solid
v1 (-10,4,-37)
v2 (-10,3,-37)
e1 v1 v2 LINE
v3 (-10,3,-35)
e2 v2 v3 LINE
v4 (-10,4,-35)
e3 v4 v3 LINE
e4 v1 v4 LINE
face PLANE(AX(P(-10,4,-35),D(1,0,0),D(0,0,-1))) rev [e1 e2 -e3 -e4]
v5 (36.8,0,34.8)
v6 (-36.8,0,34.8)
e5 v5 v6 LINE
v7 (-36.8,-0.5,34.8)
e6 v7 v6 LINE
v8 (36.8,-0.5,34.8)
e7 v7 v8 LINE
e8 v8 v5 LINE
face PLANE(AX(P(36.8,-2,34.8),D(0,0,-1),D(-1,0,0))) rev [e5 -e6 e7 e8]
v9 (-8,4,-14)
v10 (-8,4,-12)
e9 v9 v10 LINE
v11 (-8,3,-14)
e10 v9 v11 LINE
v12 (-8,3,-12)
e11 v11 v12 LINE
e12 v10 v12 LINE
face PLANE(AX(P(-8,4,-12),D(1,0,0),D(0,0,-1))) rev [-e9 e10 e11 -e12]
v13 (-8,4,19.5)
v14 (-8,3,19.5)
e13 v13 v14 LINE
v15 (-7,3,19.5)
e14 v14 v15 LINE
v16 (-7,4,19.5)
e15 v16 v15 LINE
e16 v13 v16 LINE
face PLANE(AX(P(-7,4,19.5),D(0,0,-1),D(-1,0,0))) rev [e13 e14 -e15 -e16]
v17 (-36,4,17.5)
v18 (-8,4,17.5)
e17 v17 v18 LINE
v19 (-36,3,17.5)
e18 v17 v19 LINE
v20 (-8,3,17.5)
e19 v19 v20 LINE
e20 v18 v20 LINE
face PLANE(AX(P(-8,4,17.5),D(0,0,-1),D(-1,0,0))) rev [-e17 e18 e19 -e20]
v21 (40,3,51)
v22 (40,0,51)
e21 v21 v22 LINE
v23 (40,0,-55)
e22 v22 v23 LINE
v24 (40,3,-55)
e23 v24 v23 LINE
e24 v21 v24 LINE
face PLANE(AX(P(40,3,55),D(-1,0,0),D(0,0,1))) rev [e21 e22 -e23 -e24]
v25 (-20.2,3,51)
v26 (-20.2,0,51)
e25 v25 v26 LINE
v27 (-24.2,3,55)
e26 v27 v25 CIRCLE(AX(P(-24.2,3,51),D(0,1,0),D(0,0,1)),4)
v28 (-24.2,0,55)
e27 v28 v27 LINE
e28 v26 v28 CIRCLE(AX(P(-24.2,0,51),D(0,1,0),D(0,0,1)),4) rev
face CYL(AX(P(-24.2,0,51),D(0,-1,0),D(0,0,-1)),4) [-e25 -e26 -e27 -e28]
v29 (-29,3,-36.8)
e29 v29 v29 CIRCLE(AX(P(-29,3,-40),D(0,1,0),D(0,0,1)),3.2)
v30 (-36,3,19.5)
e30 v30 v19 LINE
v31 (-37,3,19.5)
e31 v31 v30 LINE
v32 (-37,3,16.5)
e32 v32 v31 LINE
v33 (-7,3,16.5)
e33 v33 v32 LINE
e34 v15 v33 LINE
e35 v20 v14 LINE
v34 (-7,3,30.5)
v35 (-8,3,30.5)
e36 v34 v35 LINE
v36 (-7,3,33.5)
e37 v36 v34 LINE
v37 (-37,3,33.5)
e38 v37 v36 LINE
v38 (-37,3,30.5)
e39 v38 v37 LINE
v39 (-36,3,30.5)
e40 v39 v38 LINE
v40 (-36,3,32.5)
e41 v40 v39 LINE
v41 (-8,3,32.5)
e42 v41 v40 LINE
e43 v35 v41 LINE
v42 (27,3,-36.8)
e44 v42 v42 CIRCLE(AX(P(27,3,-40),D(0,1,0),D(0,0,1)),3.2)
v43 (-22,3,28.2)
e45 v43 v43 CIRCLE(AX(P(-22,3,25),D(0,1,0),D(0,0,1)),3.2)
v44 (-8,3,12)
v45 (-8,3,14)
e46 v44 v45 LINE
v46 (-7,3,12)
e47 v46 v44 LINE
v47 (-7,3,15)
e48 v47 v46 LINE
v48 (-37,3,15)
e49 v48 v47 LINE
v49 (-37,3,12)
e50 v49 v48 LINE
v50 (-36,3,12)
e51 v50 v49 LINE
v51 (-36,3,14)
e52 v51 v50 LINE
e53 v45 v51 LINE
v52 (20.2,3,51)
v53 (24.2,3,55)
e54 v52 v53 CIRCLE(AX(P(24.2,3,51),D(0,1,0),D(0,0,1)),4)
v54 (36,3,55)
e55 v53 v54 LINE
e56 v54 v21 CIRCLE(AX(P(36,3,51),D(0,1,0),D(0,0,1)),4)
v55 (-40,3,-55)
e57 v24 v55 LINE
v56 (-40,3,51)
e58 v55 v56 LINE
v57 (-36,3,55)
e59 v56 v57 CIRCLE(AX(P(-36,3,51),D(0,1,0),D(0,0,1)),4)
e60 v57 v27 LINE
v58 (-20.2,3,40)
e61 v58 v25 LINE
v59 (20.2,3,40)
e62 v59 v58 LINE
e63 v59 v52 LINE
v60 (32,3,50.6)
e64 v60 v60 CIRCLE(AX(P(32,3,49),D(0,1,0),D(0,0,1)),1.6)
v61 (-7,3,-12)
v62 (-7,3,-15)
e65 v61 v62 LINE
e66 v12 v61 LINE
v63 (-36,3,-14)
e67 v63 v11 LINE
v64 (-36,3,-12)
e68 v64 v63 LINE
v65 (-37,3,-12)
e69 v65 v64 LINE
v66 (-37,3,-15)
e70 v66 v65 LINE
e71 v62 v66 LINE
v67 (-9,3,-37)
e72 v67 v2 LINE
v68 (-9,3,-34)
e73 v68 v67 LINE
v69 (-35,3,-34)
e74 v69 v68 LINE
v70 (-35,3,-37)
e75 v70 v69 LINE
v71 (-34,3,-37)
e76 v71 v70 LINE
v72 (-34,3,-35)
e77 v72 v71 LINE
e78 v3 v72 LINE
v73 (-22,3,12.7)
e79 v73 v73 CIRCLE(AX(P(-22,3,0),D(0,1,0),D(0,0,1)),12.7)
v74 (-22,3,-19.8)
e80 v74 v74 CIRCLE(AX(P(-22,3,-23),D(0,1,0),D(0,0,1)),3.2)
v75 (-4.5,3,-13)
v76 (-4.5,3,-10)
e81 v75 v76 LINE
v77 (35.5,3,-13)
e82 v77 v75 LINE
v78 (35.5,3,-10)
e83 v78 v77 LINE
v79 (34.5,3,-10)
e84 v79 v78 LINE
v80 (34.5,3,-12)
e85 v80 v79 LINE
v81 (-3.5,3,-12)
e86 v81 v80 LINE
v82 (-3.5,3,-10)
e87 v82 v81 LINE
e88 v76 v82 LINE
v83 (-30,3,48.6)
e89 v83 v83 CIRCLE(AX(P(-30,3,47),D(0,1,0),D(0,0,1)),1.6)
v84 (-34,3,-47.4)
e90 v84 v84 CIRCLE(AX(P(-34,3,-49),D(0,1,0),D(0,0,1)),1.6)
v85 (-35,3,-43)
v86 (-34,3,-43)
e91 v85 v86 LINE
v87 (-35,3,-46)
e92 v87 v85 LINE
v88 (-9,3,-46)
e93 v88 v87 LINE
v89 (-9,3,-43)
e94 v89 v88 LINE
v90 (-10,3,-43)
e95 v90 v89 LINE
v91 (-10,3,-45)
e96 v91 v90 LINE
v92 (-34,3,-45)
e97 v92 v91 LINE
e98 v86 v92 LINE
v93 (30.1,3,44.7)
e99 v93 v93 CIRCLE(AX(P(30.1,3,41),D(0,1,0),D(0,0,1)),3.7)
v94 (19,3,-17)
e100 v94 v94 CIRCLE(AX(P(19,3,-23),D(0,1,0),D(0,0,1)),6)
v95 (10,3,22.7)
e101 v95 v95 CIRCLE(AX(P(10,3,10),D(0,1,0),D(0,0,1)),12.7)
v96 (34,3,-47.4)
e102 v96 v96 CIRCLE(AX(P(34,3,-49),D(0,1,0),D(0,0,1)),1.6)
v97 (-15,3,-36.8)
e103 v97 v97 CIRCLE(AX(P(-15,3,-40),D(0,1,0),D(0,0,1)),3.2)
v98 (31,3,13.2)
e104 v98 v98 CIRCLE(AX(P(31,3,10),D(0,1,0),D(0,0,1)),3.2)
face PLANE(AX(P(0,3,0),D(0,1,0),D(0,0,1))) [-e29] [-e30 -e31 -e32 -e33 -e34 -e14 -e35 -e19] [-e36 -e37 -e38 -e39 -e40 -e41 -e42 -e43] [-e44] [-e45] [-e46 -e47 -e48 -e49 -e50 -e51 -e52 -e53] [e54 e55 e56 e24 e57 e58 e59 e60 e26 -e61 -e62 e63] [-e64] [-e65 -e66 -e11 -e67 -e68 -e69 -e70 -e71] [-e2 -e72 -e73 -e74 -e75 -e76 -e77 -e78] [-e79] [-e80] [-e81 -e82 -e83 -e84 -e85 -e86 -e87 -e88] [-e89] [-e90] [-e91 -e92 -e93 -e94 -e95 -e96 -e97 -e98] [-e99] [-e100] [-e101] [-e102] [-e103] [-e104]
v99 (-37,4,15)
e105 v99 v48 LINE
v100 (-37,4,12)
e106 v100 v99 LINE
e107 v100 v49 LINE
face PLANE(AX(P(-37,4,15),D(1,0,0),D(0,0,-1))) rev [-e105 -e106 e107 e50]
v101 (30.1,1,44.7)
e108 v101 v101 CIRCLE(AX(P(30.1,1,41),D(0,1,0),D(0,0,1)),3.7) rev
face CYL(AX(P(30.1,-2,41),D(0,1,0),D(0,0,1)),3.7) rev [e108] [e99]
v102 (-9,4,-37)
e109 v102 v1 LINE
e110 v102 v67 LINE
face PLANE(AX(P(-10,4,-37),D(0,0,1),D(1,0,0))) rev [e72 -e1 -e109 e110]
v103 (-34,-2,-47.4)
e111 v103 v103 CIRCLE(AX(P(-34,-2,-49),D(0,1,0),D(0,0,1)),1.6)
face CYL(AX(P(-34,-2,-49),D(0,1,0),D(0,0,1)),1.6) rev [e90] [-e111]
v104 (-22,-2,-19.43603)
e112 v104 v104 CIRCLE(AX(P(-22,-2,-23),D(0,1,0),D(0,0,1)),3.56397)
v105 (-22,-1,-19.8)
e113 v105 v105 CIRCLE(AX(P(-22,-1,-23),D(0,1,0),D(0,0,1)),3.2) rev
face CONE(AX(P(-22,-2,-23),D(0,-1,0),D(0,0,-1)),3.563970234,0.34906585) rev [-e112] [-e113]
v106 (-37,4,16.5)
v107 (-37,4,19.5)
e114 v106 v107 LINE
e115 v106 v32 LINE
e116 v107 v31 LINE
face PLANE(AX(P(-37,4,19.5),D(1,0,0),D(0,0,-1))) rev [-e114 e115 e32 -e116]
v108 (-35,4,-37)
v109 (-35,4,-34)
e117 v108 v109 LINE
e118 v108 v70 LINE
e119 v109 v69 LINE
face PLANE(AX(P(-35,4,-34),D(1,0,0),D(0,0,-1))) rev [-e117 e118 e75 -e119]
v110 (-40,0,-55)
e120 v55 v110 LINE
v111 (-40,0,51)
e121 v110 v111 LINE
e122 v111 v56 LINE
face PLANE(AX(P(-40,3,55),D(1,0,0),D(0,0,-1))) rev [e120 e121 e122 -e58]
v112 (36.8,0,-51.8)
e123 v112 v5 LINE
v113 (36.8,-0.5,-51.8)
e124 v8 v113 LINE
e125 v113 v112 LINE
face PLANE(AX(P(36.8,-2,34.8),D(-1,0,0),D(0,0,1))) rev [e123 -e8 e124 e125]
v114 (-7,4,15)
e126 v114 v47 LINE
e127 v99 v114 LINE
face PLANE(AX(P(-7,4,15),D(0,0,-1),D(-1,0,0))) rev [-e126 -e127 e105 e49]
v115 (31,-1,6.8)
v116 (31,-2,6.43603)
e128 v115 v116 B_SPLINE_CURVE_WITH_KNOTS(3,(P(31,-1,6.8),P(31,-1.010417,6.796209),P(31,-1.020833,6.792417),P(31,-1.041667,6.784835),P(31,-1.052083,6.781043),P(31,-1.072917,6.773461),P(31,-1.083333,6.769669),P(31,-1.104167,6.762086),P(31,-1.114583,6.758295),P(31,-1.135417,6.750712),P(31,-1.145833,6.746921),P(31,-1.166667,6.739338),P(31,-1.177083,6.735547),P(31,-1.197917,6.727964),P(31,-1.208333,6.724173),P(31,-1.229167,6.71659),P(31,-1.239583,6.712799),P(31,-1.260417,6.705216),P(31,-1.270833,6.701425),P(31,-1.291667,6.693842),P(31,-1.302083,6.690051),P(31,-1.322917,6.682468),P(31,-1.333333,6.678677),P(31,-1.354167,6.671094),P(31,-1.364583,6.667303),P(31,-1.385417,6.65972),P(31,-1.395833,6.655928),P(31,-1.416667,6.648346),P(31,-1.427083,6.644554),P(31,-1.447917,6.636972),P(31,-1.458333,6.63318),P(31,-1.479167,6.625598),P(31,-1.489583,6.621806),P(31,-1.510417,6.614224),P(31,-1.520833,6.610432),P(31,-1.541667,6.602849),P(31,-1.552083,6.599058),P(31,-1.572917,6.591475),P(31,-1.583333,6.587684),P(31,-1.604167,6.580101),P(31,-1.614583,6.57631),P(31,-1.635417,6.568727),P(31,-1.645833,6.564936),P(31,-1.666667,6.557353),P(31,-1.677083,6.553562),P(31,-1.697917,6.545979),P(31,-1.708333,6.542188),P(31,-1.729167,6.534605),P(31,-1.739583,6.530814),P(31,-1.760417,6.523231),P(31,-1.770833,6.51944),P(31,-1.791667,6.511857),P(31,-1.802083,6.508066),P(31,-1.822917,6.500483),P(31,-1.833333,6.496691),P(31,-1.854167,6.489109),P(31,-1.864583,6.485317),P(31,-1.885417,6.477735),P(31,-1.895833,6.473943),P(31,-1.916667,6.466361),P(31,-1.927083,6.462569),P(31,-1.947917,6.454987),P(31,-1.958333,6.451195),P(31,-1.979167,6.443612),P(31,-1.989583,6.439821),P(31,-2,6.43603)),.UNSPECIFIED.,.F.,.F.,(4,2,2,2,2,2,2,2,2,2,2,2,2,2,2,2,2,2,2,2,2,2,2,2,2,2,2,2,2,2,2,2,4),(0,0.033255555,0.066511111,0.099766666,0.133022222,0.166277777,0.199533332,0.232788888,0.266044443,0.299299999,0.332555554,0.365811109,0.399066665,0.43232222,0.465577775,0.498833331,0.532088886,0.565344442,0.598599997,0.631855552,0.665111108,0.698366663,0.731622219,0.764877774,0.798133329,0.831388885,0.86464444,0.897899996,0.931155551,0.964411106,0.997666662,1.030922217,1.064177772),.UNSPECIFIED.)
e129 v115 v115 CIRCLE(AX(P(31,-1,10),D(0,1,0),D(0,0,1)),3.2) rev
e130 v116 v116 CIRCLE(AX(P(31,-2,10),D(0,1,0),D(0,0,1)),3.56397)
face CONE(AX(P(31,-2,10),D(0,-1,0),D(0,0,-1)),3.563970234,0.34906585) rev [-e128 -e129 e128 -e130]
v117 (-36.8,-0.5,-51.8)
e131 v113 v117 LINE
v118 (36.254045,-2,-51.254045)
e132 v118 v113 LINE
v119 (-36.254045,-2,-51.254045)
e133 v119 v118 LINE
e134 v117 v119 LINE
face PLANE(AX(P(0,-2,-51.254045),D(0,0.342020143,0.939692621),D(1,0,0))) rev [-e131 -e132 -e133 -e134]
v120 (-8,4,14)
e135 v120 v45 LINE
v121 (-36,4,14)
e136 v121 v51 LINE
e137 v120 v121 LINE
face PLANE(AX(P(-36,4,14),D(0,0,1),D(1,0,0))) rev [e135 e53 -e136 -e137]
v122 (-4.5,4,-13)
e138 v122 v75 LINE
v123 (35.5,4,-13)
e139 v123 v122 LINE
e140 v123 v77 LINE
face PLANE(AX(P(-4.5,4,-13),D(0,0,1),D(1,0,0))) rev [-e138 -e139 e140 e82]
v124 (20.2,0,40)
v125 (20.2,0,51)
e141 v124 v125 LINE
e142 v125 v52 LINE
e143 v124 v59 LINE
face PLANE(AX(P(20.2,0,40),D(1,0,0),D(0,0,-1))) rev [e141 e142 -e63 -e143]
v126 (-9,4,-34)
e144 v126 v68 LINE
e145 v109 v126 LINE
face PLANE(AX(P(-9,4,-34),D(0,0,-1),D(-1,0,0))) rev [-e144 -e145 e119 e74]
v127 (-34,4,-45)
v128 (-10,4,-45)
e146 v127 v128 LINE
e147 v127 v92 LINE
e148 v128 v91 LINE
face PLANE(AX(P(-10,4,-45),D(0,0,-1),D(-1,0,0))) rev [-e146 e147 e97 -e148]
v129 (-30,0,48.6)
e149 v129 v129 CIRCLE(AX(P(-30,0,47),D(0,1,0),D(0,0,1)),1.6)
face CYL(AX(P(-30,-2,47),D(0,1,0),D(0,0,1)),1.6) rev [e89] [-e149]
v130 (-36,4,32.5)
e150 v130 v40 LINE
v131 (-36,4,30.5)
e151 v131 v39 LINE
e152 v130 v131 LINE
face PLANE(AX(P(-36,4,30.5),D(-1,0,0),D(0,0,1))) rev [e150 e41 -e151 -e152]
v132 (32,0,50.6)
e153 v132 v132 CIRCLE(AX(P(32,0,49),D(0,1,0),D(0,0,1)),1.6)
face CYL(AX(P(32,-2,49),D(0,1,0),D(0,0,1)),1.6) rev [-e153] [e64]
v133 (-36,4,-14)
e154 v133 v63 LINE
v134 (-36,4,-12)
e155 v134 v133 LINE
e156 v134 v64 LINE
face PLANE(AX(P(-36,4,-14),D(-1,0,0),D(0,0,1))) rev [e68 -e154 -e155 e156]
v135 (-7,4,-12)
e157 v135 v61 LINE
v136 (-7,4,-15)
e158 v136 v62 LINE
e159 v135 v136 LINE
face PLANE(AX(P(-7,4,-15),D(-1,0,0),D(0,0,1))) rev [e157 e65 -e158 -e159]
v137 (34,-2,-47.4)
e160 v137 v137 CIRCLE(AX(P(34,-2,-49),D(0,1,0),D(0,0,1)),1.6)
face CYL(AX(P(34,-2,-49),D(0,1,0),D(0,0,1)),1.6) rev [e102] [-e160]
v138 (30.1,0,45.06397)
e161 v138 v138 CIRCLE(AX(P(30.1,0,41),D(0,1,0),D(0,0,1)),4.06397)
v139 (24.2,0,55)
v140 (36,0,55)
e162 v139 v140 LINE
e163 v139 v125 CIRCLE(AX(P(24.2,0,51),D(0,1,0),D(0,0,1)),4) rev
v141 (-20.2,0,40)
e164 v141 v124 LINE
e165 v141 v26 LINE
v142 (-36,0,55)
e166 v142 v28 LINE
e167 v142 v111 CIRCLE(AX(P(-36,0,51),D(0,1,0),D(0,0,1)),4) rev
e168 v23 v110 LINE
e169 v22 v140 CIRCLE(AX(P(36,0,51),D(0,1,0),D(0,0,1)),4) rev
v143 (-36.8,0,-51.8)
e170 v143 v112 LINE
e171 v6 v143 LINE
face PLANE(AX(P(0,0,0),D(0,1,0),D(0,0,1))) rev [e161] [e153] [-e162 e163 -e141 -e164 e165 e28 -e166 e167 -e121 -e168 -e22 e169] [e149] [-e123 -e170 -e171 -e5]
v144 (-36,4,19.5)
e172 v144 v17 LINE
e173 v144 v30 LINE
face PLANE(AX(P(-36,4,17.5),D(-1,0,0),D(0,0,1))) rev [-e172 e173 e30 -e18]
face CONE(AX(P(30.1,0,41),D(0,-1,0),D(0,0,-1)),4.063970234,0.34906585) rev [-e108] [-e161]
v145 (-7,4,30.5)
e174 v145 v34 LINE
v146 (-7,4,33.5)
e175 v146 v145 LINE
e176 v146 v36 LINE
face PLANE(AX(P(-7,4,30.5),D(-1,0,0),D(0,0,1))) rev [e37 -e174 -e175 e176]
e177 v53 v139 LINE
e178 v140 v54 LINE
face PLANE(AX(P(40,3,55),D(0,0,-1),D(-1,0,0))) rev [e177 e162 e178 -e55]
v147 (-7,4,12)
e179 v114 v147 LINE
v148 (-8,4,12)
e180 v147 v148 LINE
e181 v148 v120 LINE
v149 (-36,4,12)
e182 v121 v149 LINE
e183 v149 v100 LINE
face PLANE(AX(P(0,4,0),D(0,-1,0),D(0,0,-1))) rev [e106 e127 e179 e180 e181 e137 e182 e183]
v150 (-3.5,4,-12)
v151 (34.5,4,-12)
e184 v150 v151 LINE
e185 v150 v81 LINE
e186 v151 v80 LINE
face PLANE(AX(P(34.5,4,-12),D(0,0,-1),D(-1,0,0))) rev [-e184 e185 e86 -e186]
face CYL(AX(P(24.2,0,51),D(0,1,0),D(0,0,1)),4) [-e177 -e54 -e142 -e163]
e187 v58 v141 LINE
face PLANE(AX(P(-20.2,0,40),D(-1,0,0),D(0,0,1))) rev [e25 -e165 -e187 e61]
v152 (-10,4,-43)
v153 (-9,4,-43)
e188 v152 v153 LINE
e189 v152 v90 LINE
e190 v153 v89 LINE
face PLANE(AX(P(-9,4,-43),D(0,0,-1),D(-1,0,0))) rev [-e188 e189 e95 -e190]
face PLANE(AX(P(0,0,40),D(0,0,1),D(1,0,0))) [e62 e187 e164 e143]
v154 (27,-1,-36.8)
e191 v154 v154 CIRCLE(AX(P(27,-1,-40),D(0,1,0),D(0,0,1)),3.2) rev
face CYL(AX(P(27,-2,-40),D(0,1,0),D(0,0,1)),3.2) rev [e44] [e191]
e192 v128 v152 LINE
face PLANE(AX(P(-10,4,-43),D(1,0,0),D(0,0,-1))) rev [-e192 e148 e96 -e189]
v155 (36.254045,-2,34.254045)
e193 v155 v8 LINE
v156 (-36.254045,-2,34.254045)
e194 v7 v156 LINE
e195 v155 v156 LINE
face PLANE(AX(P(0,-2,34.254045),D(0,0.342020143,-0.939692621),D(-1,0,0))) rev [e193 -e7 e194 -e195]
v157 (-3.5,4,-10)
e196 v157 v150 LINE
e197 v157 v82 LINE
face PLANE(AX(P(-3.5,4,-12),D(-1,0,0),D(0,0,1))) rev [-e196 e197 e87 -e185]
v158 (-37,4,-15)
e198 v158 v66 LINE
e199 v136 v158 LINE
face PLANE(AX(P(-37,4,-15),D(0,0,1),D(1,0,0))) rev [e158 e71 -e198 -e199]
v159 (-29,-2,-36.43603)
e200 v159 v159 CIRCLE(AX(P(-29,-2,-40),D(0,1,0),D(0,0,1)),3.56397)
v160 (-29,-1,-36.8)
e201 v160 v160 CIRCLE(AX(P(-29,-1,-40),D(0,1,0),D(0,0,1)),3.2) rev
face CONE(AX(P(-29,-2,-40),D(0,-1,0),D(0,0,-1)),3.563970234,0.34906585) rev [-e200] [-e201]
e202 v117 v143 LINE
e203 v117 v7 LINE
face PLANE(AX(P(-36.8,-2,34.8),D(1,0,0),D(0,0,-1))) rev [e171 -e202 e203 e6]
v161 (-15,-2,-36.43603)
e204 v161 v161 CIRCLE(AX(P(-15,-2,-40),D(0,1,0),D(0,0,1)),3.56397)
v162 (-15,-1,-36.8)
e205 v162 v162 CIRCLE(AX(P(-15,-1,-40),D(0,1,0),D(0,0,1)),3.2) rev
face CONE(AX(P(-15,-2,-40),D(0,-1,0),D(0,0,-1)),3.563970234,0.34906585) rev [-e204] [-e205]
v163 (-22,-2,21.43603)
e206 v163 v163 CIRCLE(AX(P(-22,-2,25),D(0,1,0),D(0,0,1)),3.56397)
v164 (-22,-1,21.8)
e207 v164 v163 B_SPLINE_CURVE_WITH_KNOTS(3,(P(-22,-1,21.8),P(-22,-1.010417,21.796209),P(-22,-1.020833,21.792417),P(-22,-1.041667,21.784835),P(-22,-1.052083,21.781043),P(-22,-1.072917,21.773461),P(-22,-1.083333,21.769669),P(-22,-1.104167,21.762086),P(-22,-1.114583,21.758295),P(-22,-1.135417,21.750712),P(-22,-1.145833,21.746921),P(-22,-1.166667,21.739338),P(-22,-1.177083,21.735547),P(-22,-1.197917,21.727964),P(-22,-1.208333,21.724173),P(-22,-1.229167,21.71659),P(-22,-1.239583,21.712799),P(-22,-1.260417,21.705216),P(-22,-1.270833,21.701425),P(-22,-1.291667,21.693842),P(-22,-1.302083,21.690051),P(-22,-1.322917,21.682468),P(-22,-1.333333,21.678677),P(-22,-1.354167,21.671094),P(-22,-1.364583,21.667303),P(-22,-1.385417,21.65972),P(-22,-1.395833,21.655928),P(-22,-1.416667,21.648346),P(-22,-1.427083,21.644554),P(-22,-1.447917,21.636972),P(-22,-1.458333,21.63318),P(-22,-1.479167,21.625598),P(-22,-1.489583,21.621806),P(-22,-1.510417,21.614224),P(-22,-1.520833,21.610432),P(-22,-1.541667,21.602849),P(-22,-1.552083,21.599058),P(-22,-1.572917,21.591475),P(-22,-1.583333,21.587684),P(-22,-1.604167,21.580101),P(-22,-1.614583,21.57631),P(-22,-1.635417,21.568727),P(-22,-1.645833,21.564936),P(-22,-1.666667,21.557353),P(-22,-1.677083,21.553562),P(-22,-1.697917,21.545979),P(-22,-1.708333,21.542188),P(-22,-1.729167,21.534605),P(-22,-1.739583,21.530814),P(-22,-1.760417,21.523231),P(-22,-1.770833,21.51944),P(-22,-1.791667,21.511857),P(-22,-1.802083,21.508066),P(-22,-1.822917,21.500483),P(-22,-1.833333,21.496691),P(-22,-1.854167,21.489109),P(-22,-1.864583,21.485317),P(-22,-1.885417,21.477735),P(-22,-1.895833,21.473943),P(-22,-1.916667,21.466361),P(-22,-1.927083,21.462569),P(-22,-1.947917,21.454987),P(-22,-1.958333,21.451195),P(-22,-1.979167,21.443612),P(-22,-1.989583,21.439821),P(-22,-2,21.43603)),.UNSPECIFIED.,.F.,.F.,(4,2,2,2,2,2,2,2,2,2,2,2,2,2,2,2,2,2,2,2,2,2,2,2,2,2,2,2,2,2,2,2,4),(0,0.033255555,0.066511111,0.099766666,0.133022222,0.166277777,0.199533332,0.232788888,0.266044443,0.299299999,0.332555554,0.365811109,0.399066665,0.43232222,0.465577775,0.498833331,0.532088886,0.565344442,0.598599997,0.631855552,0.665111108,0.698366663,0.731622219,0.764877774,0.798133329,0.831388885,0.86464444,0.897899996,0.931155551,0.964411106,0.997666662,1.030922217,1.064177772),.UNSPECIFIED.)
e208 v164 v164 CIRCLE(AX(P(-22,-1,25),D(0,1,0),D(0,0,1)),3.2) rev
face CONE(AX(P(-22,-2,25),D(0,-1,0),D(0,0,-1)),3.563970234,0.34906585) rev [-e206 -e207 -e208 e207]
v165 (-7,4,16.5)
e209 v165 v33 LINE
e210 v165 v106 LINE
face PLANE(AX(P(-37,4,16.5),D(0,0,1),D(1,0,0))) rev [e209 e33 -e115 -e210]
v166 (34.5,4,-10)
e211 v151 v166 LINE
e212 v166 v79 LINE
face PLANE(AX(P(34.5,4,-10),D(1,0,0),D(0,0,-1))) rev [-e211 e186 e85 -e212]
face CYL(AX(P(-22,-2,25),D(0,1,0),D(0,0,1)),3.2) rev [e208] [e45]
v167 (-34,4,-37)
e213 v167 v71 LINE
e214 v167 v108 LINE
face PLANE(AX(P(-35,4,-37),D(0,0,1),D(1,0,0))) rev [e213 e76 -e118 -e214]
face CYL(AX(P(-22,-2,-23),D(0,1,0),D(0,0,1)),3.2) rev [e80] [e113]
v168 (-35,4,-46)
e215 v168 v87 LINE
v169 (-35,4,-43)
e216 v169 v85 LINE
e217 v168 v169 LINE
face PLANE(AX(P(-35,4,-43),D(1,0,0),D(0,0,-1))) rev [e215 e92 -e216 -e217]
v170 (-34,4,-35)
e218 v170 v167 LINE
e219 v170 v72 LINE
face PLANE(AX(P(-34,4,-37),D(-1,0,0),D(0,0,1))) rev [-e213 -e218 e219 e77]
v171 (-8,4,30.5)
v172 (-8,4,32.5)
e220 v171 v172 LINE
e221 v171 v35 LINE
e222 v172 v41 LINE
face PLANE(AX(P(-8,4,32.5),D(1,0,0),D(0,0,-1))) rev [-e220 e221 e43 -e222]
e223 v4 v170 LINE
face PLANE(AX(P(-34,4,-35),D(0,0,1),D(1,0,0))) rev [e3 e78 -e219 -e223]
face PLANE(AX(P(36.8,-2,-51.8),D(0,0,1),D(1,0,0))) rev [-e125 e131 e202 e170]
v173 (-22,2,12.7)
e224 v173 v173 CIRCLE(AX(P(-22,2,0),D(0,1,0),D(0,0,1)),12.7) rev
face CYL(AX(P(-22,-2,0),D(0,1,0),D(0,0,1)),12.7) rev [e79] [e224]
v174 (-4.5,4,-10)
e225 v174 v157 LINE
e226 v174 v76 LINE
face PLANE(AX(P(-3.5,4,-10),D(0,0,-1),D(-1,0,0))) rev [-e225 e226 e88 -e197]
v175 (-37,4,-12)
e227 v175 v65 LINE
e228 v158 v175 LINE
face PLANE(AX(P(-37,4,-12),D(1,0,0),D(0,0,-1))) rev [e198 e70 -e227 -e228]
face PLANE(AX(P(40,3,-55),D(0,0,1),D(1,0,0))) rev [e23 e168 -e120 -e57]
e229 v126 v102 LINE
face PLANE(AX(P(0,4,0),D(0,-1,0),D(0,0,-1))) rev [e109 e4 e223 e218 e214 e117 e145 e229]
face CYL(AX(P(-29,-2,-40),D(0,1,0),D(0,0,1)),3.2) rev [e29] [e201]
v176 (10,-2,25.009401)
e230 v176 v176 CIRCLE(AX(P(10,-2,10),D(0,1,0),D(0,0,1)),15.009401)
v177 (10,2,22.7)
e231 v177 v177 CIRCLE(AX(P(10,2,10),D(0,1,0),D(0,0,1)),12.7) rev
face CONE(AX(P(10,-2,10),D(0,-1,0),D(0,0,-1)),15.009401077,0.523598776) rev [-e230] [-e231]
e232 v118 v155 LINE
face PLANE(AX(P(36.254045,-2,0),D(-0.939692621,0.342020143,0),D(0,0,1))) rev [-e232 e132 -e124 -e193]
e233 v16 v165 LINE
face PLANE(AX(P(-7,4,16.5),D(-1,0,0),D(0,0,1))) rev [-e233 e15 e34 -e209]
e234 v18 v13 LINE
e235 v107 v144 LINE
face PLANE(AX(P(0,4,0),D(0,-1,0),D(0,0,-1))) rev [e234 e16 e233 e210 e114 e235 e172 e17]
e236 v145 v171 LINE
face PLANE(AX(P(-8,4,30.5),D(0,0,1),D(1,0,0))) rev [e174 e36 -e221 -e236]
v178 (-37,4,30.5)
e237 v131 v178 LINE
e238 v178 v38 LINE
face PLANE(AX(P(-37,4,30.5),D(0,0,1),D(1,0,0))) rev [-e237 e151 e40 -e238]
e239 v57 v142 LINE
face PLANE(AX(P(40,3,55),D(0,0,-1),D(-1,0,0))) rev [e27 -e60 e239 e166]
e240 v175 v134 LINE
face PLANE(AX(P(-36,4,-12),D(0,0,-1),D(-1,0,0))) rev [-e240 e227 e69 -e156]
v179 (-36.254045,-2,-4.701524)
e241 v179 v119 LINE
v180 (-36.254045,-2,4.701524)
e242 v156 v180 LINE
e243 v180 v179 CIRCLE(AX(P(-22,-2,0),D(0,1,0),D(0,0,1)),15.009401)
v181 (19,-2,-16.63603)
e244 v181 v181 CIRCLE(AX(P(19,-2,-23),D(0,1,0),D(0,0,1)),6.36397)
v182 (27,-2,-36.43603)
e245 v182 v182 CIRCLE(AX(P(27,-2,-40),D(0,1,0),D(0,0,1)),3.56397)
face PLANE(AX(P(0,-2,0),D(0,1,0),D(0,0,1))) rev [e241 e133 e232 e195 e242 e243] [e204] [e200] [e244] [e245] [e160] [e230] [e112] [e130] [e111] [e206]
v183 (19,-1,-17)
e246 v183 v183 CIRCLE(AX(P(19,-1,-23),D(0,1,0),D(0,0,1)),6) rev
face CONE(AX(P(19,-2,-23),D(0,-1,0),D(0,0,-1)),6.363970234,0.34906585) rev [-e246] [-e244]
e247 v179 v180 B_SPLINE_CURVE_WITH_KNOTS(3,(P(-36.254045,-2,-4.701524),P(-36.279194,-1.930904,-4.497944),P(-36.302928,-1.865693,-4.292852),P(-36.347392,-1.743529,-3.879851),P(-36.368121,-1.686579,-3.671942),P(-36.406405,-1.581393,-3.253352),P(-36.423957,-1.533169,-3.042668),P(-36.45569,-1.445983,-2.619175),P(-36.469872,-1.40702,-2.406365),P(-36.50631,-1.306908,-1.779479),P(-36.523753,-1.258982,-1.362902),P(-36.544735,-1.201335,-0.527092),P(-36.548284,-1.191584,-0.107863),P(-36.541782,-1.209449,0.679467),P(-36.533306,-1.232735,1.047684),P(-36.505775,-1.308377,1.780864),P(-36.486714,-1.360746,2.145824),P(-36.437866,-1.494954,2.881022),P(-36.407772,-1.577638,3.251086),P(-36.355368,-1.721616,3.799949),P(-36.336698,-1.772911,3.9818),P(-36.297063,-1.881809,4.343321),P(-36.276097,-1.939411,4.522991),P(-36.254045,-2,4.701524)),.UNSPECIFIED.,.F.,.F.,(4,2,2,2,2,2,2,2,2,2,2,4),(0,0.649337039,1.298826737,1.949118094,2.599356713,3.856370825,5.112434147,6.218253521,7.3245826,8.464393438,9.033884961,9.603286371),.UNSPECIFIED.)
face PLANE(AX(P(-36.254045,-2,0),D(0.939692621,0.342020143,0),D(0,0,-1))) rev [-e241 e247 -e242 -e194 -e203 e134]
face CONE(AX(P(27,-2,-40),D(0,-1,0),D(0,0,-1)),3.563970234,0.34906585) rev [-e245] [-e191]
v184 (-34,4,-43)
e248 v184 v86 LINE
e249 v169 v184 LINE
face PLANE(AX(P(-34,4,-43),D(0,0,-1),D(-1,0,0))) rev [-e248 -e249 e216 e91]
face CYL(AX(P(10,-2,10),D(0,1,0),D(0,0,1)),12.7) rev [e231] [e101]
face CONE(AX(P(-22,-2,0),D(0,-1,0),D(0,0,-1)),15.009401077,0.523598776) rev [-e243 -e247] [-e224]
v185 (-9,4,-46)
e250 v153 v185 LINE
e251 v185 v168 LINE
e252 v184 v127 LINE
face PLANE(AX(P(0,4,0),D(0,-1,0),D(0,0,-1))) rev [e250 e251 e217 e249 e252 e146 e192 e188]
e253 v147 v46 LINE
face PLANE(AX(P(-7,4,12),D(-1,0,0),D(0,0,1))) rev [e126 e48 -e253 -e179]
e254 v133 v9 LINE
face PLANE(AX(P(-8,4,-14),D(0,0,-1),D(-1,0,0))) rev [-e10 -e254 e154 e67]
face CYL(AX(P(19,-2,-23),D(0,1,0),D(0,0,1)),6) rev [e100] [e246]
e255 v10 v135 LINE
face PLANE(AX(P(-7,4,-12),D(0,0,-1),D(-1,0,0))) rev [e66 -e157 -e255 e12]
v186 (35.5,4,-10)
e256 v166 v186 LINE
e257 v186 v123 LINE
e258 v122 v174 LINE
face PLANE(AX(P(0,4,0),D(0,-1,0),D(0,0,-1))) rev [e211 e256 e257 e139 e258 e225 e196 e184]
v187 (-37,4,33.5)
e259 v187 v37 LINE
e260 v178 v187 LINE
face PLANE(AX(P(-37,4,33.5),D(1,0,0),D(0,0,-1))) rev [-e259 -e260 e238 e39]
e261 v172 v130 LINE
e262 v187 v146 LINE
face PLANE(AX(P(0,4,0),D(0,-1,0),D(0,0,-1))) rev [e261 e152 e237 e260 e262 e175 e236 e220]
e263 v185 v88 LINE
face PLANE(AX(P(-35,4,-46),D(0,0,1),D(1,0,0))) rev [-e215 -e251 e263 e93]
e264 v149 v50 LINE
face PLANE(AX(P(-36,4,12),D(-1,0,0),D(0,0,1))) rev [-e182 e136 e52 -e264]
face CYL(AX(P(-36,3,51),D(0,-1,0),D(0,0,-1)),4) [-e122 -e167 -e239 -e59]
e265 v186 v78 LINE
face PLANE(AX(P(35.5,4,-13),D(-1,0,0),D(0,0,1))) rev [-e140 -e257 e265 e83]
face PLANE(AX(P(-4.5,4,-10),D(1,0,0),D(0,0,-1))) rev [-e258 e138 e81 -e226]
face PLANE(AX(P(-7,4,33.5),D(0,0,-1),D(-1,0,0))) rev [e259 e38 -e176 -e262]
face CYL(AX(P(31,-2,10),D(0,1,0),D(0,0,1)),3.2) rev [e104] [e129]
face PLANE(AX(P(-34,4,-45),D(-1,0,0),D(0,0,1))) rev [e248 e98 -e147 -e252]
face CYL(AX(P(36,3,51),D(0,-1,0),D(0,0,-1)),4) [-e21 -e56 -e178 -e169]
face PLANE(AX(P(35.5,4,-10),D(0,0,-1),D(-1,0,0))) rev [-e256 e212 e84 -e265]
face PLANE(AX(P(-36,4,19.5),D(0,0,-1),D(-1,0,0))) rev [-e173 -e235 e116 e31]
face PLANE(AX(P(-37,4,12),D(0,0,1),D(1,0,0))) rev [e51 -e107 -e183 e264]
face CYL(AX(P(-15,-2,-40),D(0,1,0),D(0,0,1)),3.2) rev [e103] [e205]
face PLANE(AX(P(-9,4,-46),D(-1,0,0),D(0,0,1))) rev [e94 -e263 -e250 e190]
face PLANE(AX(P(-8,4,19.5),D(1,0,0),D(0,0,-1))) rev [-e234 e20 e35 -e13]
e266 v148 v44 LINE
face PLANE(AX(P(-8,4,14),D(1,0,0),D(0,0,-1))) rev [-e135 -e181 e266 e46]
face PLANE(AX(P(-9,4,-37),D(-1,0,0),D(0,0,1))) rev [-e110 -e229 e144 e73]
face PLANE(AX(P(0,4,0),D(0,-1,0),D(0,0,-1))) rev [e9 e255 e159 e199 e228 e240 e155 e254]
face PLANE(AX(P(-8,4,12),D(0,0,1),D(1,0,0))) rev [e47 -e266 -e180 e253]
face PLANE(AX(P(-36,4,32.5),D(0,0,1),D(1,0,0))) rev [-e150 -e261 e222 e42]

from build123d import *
from OCP.BRepFilletAPI import BRepFilletAPI_MakeChamfer

# Parameters (mm, degrees)
SKETCH1_W           = 80
SKETCH1_H           = 110
BOSS_EXTRUDE1_DEPTH = 3
SKETCH2_W           = 40.4
SKETCH2_H           = 3
CUT_EXTRUDE1_DEPTH  = 15
FILLET1_R           = 4
SKETCH7_W           = 73.6
SKETCH7_H           = 86.6
BOSS_EXTRUDE2_DEPTH = 2
SKETCH3_R           = 12.7
CUT_EXTRUDE2_DEPTH  = 69.190908485
SKETCH4_R           = 6
SKETCH4_R_2         = 3.2
SKETCH4_R_3         = 3.7
SKETCH4_R_4         = 1.6
CUT_EXTRUDE3_DEPTH  = 69.190908485
CHAMFER2_SIZE       = 1.5
CHAMFER2_SIZE2      = 0.545955351
CHAMFER3_SIZE       = 2.309401077
CHAMFER3_SIZE_2     = 4
BOSS_EXTRUDE3_DEPTH = 1
CHAMFER4_SIZE       = 1
CHAMFER4_SIZE2      = 0.363970234


with BuildPart() as part:
    # Sketch1 → Boss-Extrude1 (new body)
    with BuildSketch(Plane(origin=(0, 0, 0), x_dir=(1, 0, 0), z_dir=(0, 1, 0))):
        Rectangle(SKETCH1_W, SKETCH1_H)
    extrude(amount=BOSS_EXTRUDE1_DEPTH)

    # Sketch2 → Cut-Extrude1 (cut)
    with BuildSketch(Plane.XY.offset(55)):
        with Locations((0, 1.5)):
            Rectangle(SKETCH2_W, SKETCH2_H)
    extrude(amount=-CUT_EXTRUDE1_DEPTH, mode=Mode.SUBTRACT)

    # Fillet1
    fillet1_edges = [part.edges().sort_by_distance(p)[0] for p in [
        (-20.2, 1.5, 55),
        (20.2, 1.5, 55),
        (40, 1.5, 55),
        (-40, 1.5, 55),
    ]]
    fillet(fillet1_edges, radius=FILLET1_R)

    # Sketch7 → Boss-Extrude2 (add)
    with BuildSketch(Plane.XZ):
        with Locations((0, -8.5)):
            Rectangle(SKETCH7_W, SKETCH7_H)
    extrude(amount=BOSS_EXTRUDE2_DEPTH)

    # Sketch3 → Cut-Extrude2 (cut, through all)
    with BuildSketch(Plane(origin=(0, 3, 0), x_dir=(1, 0, 0), z_dir=(0, 1, 0))):
        with Locations(Location((-22, 0, 0), (0, 0, 270))):
            Circle(SKETCH3_R)
        with Locations(Location((10, -10, 0), (0, 0, 270))):
            Circle(SKETCH3_R)
    extrude(amount=-CUT_EXTRUDE2_DEPTH, mode=Mode.SUBTRACT)

    # Sketch4 → Cut-Extrude3 (cut, through all)
    with BuildSketch(Plane(origin=(0, 3, 0), x_dir=(1, 0, 0), z_dir=(0, 1, 0))):
        with Locations(Location((19, 23, 0), (0, 0, 270))):
            Circle(SKETCH4_R)
        with Locations(Location((-22, 23, 0), (0, 0, 270))):
            Circle(SKETCH4_R_2)
        with Locations(Location((31, -10, 0), (0, 0, 270))):
            Circle(SKETCH4_R_2)
        with Locations(Location((30.1, -41, 0), (0, 0, 270))):
            Circle(SKETCH4_R_3)
        with Locations(Location((-29, 40, 0), (0, 0, 270))):
            Circle(SKETCH4_R_2)
        with Locations(Location((-15, 40, 0), (0, 0, 270))):
            Circle(SKETCH4_R_2)
        with Locations(Location((27, 40, 0), (0, 0, 270))):
            Circle(SKETCH4_R_2)
        with Locations(Location((-22, -25, 0), (0, 0, 270))):
            Circle(SKETCH4_R_2)
        with Locations(Location((-30, -47, 0), (0, 0, 270))):
            Circle(SKETCH4_R_4)
        with Locations(Location((-34, 49, 0), (0, 0, 270))):
            Circle(SKETCH4_R_4)
        with Locations(Location((34, 49, 0), (0, 0, 270))):
            Circle(SKETCH4_R_4)
        with Locations(Location((32, -49, 0), (0, 0, 270))):
            Circle(SKETCH4_R_4)
    extrude(amount=-CUT_EXTRUDE3_DEPTH, mode=Mode.SUBTRACT)

    # Chamfer2: one chamfer whose edges measure the first distance from different faces: ONE call of the kernel's chamfer builder (chamfer() names one face for all edges)
    chamfer2_edges_1 = [part.edges().sort_by_distance(p)[0] for p in [
        (-36.8, -2, -8.5),
    ]]
    chamfer2_side_1 = [part.faces().sort_by_distance(p)[0] for p in [
        (-36.8, -1, -8.5),
    ]]
    chamfer2_edges_2 = [part.edges().sort_by_distance(p)[0] for p in [
        (0, -2, -51.8),
    ]]
    chamfer2_side_2 = [part.faces().sort_by_distance(p)[0] for p in [
        (0, -1, -51.8),
    ]]
    chamfer2_edges_3 = [part.edges().sort_by_distance(p)[0] for p in [
        (36.8, -2, -8.5),
    ]]
    chamfer2_side_3 = [part.faces().sort_by_distance(p)[0] for p in [
        (36.8, -1, -8.5),
    ]]
    chamfer2_edges_4 = [part.edges().sort_by_distance(p)[0] for p in [
        (0, -2, 34.8),
    ]]
    chamfer2_side_4 = [part.faces().sort_by_distance(p)[0] for p in [
        (0, -1, 34.8),
    ]]
    chamfer2 = BRepFilletAPI_MakeChamfer(part.part.solid().wrapped)
    for e in chamfer2_edges_1:
        chamfer2.Add(CHAMFER2_SIZE, CHAMFER2_SIZE2, e.wrapped, chamfer2_side_1[0].wrapped)  # the first distance lies on this face
    for e in chamfer2_edges_2:
        chamfer2.Add(CHAMFER2_SIZE, CHAMFER2_SIZE2, e.wrapped, chamfer2_side_2[0].wrapped)  # the first distance lies on this face
    for e in chamfer2_edges_3:
        chamfer2.Add(CHAMFER2_SIZE, CHAMFER2_SIZE2, e.wrapped, chamfer2_side_3[0].wrapped)  # the first distance lies on this face
    for e in chamfer2_edges_4:
        chamfer2.Add(CHAMFER2_SIZE, CHAMFER2_SIZE2, e.wrapped, chamfer2_side_4[0].wrapped)  # the first distance lies on this face
    add(Compound.cast(chamfer2.Shape()), mode=Mode.REPLACE)

    # Chamfer3
    # the kernel refuses this chamfer: 4, 2.309401077 mm, written as the material it takes off along each edge
    with BuildSketch(Plane(origin=(-22, -2, 0), x_dir=(0, 0, 1), z_dir=(-1, 0, 0))) as chamfer3_piece_1:
        Polygon((12.7 + CHAMFER3_SIZE, 0), (12.7, CHAMFER3_SIZE_2), (12.7, 0), align=None)
    revolve(axis=Axis((-22, -2, 0), (0, 1, 0)), mode=Mode.SUBTRACT)
    with BuildSketch(Plane(origin=(10, -2, 10), x_dir=(0, 0, 1), z_dir=(-1, 0, 0))) as chamfer3_piece_2:
        Polygon((12.7 + CHAMFER3_SIZE, 0), (12.7, CHAMFER3_SIZE_2), (12.7, 0), align=None)
    revolve(axis=Axis((10, -2, 10), (0, 1, 0)), mode=Mode.SUBTRACT)

    # Sketch8 → Boss-Extrude3 (add)
    with BuildSketch(Plane(origin=(0, 3, 0), x_dir=(1, 0, 0), z_dir=(0, 1, 0))):
        Polygon((-35, 43), (-35, 46), (-9, 46), (-9, 43), (-10, 43), (-10, 45), (-34, 45), (-34, 43), align=None)
        Polygon((-9, 37), (-9, 34), (-35, 34), (-35, 37), (-34, 37), (-34, 35), (-10, 35), (-10, 37), align=None)
        Polygon((-37, 12), (-37, 15), (-7, 15), (-7, 12), (-8, 12), (-8, 14), (-36, 14), (-36, 12), align=None)
        Polygon((-4.5, 10), (-4.5, 13), (35.5, 13), (35.5, 10), (34.5, 10), (34.5, 12), (-3.5, 12), (-3.5, 10), align=None)
        Polygon((-7, -12), (-7, -15), (-37, -15), (-37, -12), (-36, -12), (-36, -14), (-8, -14), (-8, -12), align=None)
        Polygon((-37, -19.5), (-37, -16.5), (-7, -16.5), (-7, -19.5), (-8, -19.5), (-8, -17.5), (-36, -17.5), (-36, -19.5), align=None)
        Polygon((-7, -30.5), (-7, -33.5), (-37, -33.5), (-37, -30.5), (-36, -30.5), (-36, -32.5), (-8, -32.5), (-8, -30.5), align=None)
    extrude(amount=BOSS_EXTRUDE3_DEPTH)

    # Chamfer4: one chamfer whose edges measure the first distance from different faces: ONE call of the kernel's chamfer builder (chamfer() names one face for all edges)
    chamfer4_edges_1 = [part.edges().sort_by_distance(p)[0] for p in [
        (-22, -2, 21.8),
    ]]
    chamfer4_side_1 = [part.faces().sort_by_distance(p)[0] for p in [
        (-22, 0.5, 21.8),
    ]]
    chamfer4_edges_2 = [part.edges().sort_by_distance(p)[0] for p in [
        (-22, -2, -26.2),
    ]]
    chamfer4_side_2 = [part.faces().sort_by_distance(p)[0] for p in [
        (-22, 0.5, -26.2),
    ]]
    chamfer4_edges_3 = [part.edges().sort_by_distance(p)[0] for p in [
        (31, -2, 6.8),
    ]]
    chamfer4_side_3 = [part.faces().sort_by_distance(p)[0] for p in [
        (31, 0.5, 6.8),
    ]]
    chamfer4_edges_4 = [part.edges().sort_by_distance(p)[0] for p in [
        (30.1, 0, 37.3),
    ]]
    chamfer4_side_4 = [part.faces().sort_by_distance(p)[0] for p in [
        (30.1, 1.5, 37.3),
    ]]
    chamfer4_edges_5 = [part.edges().sort_by_distance(p)[0] for p in [
        (-29, -2, -43.2),
    ]]
    chamfer4_side_5 = [part.faces().sort_by_distance(p)[0] for p in [
        (-29, 0.5, -43.2),
    ]]
    chamfer4_edges_6 = [part.edges().sort_by_distance(p)[0] for p in [
        (-15, -2, -43.2),
    ]]
    chamfer4_side_6 = [part.faces().sort_by_distance(p)[0] for p in [
        (-15, 0.5, -43.2),
    ]]
    chamfer4_edges_7 = [part.edges().sort_by_distance(p)[0] for p in [
        (19, -2, -29),
    ]]
    chamfer4_side_7 = [part.faces().sort_by_distance(p)[0] for p in [
        (19, 0.5, -29),
    ]]
    chamfer4_edges_8 = [part.edges().sort_by_distance(p)[0] for p in [
        (27, -2, -43.2),
    ]]
    chamfer4_side_8 = [part.faces().sort_by_distance(p)[0] for p in [
        (27, 0.5, -43.2),
    ]]
    chamfer4 = BRepFilletAPI_MakeChamfer(part.part.solid().wrapped)
    for e in chamfer4_edges_1:
        chamfer4.Add(CHAMFER4_SIZE, CHAMFER4_SIZE2, e.wrapped, chamfer4_side_1[0].wrapped)  # the first distance lies on this face
    for e in chamfer4_edges_2:
        chamfer4.Add(CHAMFER4_SIZE, CHAMFER4_SIZE2, e.wrapped, chamfer4_side_2[0].wrapped)  # the first distance lies on this face
    for e in chamfer4_edges_3:
        chamfer4.Add(CHAMFER4_SIZE, CHAMFER4_SIZE2, e.wrapped, chamfer4_side_3[0].wrapped)  # the first distance lies on this face
    for e in chamfer4_edges_4:
        chamfer4.Add(CHAMFER4_SIZE, CHAMFER4_SIZE2, e.wrapped, chamfer4_side_4[0].wrapped)  # the first distance lies on this face
    for e in chamfer4_edges_5:
        chamfer4.Add(CHAMFER4_SIZE, CHAMFER4_SIZE2, e.wrapped, chamfer4_side_5[0].wrapped)  # the first distance lies on this face
    for e in chamfer4_edges_6:
        chamfer4.Add(CHAMFER4_SIZE, CHAMFER4_SIZE2, e.wrapped, chamfer4_side_6[0].wrapped)  # the first distance lies on this face
    for e in chamfer4_edges_7:
        chamfer4.Add(CHAMFER4_SIZE, CHAMFER4_SIZE2, e.wrapped, chamfer4_side_7[0].wrapped)  # the first distance lies on this face
    for e in chamfer4_edges_8:
        chamfer4.Add(CHAMFER4_SIZE, CHAMFER4_SIZE2, e.wrapped, chamfer4_side_8[0].wrapped)  # the first distance lies on this face
    add(Compound.cast(chamfer4.Shape()), mode=Mode.REPLACE)


solid = part.part
